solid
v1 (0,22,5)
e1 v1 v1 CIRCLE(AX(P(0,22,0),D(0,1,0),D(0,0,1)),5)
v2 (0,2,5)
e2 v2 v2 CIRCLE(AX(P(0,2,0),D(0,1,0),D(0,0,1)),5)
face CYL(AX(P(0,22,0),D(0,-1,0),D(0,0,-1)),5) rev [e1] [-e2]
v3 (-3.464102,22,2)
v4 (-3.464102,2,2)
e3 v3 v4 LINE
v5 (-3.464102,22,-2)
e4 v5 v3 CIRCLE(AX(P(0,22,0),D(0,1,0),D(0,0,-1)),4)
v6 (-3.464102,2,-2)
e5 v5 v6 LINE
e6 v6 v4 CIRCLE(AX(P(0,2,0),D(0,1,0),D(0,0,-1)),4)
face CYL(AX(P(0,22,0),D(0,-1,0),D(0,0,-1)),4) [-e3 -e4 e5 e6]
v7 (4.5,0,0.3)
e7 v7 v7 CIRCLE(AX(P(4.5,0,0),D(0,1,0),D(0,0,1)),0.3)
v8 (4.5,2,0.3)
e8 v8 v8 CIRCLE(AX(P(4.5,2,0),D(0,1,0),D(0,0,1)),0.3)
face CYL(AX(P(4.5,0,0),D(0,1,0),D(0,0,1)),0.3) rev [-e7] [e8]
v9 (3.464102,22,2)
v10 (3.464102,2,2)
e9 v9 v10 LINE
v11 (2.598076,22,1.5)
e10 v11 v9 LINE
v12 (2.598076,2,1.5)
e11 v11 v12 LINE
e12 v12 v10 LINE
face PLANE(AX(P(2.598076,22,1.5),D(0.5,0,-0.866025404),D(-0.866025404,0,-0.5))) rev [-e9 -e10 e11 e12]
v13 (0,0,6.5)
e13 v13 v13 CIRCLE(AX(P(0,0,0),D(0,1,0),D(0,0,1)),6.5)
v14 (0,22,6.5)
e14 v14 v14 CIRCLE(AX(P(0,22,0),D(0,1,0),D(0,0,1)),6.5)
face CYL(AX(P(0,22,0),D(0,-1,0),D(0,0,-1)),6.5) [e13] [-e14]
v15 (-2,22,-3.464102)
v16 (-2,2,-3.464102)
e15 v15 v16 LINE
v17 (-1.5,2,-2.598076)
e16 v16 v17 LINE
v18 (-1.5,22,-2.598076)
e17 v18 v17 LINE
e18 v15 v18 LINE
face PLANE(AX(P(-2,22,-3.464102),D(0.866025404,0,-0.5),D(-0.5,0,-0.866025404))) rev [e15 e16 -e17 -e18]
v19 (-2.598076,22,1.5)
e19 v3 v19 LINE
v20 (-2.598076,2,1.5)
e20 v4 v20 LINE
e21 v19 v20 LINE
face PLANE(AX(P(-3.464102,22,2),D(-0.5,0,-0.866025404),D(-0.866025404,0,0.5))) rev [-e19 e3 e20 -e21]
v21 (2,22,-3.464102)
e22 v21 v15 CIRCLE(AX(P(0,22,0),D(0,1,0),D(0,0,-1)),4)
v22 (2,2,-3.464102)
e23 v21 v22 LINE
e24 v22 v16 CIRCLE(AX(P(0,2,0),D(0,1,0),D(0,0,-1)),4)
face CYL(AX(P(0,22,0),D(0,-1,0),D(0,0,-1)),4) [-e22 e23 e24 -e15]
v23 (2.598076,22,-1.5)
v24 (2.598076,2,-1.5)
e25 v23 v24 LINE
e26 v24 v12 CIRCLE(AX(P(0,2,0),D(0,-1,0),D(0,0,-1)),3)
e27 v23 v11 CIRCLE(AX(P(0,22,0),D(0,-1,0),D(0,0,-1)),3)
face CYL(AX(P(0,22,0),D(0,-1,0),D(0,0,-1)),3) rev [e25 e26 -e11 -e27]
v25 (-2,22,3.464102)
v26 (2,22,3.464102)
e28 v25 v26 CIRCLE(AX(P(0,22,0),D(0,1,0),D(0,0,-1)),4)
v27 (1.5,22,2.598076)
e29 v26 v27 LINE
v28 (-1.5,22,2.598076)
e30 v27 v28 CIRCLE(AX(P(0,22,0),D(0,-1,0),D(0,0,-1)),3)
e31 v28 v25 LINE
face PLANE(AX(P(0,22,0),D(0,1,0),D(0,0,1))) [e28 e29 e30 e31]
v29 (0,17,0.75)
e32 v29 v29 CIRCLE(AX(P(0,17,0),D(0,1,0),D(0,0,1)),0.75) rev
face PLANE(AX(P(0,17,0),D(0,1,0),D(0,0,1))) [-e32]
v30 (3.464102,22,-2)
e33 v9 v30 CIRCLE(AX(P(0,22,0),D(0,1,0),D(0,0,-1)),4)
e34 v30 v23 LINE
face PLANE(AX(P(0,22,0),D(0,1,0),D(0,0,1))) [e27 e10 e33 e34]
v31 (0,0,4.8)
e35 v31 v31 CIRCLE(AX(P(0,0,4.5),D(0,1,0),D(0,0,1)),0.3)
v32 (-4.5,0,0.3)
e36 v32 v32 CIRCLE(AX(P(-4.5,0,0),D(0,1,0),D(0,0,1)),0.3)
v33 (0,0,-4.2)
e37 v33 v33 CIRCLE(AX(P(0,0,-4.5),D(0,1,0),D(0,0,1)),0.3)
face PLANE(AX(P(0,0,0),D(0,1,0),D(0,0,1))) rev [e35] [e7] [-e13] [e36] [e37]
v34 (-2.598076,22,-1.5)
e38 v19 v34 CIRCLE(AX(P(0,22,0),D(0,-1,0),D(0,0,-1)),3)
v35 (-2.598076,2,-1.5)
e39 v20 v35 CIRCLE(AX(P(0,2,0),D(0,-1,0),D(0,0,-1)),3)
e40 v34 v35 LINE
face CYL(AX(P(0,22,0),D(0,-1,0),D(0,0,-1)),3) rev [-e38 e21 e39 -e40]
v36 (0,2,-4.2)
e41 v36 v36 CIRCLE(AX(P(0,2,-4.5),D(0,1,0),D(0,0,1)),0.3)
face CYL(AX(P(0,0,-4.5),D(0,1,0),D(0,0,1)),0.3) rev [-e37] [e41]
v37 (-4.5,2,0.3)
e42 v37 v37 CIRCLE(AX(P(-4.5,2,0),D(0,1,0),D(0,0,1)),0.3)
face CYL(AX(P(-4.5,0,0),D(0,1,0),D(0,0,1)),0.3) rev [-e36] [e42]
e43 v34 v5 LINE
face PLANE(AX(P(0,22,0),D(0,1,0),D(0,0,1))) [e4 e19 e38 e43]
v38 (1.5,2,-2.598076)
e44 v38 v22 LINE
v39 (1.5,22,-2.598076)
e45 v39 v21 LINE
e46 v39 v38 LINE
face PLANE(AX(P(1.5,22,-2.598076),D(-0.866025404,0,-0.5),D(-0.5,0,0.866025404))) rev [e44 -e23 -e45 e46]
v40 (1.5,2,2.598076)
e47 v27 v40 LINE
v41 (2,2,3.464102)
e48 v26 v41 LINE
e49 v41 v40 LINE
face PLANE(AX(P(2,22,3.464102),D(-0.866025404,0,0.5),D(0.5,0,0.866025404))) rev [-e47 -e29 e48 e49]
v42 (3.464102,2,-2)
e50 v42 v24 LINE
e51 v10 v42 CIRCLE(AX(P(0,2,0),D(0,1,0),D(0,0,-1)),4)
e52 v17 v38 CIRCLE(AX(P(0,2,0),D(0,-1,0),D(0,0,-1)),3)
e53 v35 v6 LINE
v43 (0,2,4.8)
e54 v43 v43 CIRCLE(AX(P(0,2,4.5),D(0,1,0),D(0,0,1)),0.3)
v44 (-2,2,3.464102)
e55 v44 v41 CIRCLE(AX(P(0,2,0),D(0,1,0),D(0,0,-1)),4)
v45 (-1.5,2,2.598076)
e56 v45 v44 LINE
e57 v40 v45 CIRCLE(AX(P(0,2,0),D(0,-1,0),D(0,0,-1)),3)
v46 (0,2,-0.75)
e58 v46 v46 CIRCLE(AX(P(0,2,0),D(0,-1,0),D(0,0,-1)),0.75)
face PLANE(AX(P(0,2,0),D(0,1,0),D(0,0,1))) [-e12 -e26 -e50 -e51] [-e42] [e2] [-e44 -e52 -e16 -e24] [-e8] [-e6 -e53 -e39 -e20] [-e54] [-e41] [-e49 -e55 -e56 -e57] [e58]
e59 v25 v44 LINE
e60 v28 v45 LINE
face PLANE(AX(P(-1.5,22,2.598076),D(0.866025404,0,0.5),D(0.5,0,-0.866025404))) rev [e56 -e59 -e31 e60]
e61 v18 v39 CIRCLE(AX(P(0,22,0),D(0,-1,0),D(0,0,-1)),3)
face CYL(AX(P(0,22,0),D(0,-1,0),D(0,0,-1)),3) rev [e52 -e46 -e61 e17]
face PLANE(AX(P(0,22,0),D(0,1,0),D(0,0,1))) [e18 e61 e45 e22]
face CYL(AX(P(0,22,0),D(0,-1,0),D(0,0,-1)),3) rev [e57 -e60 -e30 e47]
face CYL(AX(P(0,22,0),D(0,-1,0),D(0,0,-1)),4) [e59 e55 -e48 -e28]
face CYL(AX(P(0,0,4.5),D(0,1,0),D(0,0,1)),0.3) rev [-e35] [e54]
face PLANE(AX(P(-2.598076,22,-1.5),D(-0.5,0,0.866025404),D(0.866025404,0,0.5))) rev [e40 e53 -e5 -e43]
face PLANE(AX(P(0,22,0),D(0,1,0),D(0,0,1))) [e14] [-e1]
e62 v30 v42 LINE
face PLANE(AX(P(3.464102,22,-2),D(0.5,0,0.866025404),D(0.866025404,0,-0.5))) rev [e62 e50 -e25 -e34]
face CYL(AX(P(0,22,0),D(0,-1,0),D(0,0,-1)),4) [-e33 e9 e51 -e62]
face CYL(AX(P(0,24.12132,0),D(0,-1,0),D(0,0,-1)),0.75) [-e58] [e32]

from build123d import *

# Parameters (mm, degrees)
SKETCH1_R           = 6.5
BOSS_EXTRUDE1_DEPTH = 22
CAVITY1_START       = 2
CAVITY1_OUTLINE_R   = 5
CAVITY1_OUTLINE_R_2 = 0.75
CAVITY1_DEPTH       = 20
CAVITY1_START_2     = 17
CAVITY1_2_OUTLINE_R = 0.75
CAVITY1_2_DEPTH     = 5
SKETCH2_R           = 0.3
CUT_EXTRUDE1_DEPTH  = 23.011360703


# Read off the part's stored shape, not the designer's step: Cavity1
with BuildPart() as part:
    # Sketch1 → Boss-Extrude1 (new body)
    with BuildSketch(Plane(origin=(0, 0, 0), x_dir=(1, 0, 0), z_dir=(0, 1, 0))):
        with Locations(Location((0, 0, 0), (0, 0, 270))):
            Circle(SKETCH1_R)
    extrude(amount=BOSS_EXTRUDE1_DEPTH)

    # Cavity1 outline → Cavity1 (cut)
    with BuildSketch(Plane(origin=(0, 0, 0), x_dir=(1, 0, 0), z_dir=(0, 1, 0)).offset(CAVITY1_START)):
        Circle(CAVITY1_OUTLINE_R)
        with BuildLine():
            ThreePointArc((-1.5, -2.598076211), (0, -3), (1.5, -2.598076211))
            Line((1.5, -2.598076211), (2, -3.464101615))
            ThreePointArc((2, -3.464101615), (0, -4), (-2, -3.464101615))
            Line((-2, -3.464101615), (-1.5, -2.598076211))
        make_face(mode=Mode.SUBTRACT)
        with BuildLine():
            ThreePointArc((-2.598076211, 1.5), (-3, 0), (-2.598076211, -1.5))
            Line((-2.598076211, -1.5), (-3.464101615, -2))
            ThreePointArc((-3.464101615, -2), (-4, 0), (-3.464101615, 2))
            Line((-3.464101615, 2), (-2.598076211, 1.5))
        make_face(mode=Mode.SUBTRACT)
        Circle(CAVITY1_OUTLINE_R_2, mode=Mode.SUBTRACT)
        with BuildLine():
            ThreePointArc((2.598076211, -1.5), (3, 0), (2.598076211, 1.5))
            Line((2.598076211, 1.5), (3.464101615, 2))
            ThreePointArc((3.464101615, 2), (4, 0), (3.464101615, -2))
            Line((3.464101615, -2), (2.598076211, -1.5))
        make_face(mode=Mode.SUBTRACT)
        with BuildLine():
            ThreePointArc((1.5, 2.598076211), (0, 3), (-1.5, 2.598076211))
            Line((-1.5, 2.598076211), (-2, 3.464101615))
            ThreePointArc((-2, 3.464101615), (0, 4), (2, 3.464101615))
            Line((2, 3.464101615), (1.5, 2.598076211))
        make_face(mode=Mode.SUBTRACT)
    extrude(amount=CAVITY1_DEPTH, mode=Mode.SUBTRACT)

    # Cavity1 2 outline → Cavity1 2 (cut)
    with BuildSketch(Plane(origin=(0, 0, 0), x_dir=(1, 0, 0), z_dir=(0, 1, 0)).offset(CAVITY1_START_2)):
        Circle(CAVITY1_2_OUTLINE_R)
    extrude(amount=CAVITY1_2_DEPTH, mode=Mode.SUBTRACT)

    # Sketch2 → Cut-Extrude1 (cut, through all)
    with BuildSketch(Plane(origin=(0, 2, 0), x_dir=(1, 0, 0), z_dir=(0, 1, 0))):
        with Locations(Location((0, 4.5, 0), (0, 0, 270))):
            Circle(SKETCH2_R)
        with Locations(Location((4.5, 0, 0), (0, 0, 270))):
            Circle(SKETCH2_R)
        with Locations(Location((0, -4.5, 0), (0, 0, 270))):
            Circle(SKETCH2_R)
        with Locations(Location((-4.5, 0, 0), (0, 0, 270))):
            Circle(SKETCH2_R)
    extrude(amount=-CUT_EXTRUDE1_DEPTH, mode=Mode.SUBTRACT)


solid = part.part
